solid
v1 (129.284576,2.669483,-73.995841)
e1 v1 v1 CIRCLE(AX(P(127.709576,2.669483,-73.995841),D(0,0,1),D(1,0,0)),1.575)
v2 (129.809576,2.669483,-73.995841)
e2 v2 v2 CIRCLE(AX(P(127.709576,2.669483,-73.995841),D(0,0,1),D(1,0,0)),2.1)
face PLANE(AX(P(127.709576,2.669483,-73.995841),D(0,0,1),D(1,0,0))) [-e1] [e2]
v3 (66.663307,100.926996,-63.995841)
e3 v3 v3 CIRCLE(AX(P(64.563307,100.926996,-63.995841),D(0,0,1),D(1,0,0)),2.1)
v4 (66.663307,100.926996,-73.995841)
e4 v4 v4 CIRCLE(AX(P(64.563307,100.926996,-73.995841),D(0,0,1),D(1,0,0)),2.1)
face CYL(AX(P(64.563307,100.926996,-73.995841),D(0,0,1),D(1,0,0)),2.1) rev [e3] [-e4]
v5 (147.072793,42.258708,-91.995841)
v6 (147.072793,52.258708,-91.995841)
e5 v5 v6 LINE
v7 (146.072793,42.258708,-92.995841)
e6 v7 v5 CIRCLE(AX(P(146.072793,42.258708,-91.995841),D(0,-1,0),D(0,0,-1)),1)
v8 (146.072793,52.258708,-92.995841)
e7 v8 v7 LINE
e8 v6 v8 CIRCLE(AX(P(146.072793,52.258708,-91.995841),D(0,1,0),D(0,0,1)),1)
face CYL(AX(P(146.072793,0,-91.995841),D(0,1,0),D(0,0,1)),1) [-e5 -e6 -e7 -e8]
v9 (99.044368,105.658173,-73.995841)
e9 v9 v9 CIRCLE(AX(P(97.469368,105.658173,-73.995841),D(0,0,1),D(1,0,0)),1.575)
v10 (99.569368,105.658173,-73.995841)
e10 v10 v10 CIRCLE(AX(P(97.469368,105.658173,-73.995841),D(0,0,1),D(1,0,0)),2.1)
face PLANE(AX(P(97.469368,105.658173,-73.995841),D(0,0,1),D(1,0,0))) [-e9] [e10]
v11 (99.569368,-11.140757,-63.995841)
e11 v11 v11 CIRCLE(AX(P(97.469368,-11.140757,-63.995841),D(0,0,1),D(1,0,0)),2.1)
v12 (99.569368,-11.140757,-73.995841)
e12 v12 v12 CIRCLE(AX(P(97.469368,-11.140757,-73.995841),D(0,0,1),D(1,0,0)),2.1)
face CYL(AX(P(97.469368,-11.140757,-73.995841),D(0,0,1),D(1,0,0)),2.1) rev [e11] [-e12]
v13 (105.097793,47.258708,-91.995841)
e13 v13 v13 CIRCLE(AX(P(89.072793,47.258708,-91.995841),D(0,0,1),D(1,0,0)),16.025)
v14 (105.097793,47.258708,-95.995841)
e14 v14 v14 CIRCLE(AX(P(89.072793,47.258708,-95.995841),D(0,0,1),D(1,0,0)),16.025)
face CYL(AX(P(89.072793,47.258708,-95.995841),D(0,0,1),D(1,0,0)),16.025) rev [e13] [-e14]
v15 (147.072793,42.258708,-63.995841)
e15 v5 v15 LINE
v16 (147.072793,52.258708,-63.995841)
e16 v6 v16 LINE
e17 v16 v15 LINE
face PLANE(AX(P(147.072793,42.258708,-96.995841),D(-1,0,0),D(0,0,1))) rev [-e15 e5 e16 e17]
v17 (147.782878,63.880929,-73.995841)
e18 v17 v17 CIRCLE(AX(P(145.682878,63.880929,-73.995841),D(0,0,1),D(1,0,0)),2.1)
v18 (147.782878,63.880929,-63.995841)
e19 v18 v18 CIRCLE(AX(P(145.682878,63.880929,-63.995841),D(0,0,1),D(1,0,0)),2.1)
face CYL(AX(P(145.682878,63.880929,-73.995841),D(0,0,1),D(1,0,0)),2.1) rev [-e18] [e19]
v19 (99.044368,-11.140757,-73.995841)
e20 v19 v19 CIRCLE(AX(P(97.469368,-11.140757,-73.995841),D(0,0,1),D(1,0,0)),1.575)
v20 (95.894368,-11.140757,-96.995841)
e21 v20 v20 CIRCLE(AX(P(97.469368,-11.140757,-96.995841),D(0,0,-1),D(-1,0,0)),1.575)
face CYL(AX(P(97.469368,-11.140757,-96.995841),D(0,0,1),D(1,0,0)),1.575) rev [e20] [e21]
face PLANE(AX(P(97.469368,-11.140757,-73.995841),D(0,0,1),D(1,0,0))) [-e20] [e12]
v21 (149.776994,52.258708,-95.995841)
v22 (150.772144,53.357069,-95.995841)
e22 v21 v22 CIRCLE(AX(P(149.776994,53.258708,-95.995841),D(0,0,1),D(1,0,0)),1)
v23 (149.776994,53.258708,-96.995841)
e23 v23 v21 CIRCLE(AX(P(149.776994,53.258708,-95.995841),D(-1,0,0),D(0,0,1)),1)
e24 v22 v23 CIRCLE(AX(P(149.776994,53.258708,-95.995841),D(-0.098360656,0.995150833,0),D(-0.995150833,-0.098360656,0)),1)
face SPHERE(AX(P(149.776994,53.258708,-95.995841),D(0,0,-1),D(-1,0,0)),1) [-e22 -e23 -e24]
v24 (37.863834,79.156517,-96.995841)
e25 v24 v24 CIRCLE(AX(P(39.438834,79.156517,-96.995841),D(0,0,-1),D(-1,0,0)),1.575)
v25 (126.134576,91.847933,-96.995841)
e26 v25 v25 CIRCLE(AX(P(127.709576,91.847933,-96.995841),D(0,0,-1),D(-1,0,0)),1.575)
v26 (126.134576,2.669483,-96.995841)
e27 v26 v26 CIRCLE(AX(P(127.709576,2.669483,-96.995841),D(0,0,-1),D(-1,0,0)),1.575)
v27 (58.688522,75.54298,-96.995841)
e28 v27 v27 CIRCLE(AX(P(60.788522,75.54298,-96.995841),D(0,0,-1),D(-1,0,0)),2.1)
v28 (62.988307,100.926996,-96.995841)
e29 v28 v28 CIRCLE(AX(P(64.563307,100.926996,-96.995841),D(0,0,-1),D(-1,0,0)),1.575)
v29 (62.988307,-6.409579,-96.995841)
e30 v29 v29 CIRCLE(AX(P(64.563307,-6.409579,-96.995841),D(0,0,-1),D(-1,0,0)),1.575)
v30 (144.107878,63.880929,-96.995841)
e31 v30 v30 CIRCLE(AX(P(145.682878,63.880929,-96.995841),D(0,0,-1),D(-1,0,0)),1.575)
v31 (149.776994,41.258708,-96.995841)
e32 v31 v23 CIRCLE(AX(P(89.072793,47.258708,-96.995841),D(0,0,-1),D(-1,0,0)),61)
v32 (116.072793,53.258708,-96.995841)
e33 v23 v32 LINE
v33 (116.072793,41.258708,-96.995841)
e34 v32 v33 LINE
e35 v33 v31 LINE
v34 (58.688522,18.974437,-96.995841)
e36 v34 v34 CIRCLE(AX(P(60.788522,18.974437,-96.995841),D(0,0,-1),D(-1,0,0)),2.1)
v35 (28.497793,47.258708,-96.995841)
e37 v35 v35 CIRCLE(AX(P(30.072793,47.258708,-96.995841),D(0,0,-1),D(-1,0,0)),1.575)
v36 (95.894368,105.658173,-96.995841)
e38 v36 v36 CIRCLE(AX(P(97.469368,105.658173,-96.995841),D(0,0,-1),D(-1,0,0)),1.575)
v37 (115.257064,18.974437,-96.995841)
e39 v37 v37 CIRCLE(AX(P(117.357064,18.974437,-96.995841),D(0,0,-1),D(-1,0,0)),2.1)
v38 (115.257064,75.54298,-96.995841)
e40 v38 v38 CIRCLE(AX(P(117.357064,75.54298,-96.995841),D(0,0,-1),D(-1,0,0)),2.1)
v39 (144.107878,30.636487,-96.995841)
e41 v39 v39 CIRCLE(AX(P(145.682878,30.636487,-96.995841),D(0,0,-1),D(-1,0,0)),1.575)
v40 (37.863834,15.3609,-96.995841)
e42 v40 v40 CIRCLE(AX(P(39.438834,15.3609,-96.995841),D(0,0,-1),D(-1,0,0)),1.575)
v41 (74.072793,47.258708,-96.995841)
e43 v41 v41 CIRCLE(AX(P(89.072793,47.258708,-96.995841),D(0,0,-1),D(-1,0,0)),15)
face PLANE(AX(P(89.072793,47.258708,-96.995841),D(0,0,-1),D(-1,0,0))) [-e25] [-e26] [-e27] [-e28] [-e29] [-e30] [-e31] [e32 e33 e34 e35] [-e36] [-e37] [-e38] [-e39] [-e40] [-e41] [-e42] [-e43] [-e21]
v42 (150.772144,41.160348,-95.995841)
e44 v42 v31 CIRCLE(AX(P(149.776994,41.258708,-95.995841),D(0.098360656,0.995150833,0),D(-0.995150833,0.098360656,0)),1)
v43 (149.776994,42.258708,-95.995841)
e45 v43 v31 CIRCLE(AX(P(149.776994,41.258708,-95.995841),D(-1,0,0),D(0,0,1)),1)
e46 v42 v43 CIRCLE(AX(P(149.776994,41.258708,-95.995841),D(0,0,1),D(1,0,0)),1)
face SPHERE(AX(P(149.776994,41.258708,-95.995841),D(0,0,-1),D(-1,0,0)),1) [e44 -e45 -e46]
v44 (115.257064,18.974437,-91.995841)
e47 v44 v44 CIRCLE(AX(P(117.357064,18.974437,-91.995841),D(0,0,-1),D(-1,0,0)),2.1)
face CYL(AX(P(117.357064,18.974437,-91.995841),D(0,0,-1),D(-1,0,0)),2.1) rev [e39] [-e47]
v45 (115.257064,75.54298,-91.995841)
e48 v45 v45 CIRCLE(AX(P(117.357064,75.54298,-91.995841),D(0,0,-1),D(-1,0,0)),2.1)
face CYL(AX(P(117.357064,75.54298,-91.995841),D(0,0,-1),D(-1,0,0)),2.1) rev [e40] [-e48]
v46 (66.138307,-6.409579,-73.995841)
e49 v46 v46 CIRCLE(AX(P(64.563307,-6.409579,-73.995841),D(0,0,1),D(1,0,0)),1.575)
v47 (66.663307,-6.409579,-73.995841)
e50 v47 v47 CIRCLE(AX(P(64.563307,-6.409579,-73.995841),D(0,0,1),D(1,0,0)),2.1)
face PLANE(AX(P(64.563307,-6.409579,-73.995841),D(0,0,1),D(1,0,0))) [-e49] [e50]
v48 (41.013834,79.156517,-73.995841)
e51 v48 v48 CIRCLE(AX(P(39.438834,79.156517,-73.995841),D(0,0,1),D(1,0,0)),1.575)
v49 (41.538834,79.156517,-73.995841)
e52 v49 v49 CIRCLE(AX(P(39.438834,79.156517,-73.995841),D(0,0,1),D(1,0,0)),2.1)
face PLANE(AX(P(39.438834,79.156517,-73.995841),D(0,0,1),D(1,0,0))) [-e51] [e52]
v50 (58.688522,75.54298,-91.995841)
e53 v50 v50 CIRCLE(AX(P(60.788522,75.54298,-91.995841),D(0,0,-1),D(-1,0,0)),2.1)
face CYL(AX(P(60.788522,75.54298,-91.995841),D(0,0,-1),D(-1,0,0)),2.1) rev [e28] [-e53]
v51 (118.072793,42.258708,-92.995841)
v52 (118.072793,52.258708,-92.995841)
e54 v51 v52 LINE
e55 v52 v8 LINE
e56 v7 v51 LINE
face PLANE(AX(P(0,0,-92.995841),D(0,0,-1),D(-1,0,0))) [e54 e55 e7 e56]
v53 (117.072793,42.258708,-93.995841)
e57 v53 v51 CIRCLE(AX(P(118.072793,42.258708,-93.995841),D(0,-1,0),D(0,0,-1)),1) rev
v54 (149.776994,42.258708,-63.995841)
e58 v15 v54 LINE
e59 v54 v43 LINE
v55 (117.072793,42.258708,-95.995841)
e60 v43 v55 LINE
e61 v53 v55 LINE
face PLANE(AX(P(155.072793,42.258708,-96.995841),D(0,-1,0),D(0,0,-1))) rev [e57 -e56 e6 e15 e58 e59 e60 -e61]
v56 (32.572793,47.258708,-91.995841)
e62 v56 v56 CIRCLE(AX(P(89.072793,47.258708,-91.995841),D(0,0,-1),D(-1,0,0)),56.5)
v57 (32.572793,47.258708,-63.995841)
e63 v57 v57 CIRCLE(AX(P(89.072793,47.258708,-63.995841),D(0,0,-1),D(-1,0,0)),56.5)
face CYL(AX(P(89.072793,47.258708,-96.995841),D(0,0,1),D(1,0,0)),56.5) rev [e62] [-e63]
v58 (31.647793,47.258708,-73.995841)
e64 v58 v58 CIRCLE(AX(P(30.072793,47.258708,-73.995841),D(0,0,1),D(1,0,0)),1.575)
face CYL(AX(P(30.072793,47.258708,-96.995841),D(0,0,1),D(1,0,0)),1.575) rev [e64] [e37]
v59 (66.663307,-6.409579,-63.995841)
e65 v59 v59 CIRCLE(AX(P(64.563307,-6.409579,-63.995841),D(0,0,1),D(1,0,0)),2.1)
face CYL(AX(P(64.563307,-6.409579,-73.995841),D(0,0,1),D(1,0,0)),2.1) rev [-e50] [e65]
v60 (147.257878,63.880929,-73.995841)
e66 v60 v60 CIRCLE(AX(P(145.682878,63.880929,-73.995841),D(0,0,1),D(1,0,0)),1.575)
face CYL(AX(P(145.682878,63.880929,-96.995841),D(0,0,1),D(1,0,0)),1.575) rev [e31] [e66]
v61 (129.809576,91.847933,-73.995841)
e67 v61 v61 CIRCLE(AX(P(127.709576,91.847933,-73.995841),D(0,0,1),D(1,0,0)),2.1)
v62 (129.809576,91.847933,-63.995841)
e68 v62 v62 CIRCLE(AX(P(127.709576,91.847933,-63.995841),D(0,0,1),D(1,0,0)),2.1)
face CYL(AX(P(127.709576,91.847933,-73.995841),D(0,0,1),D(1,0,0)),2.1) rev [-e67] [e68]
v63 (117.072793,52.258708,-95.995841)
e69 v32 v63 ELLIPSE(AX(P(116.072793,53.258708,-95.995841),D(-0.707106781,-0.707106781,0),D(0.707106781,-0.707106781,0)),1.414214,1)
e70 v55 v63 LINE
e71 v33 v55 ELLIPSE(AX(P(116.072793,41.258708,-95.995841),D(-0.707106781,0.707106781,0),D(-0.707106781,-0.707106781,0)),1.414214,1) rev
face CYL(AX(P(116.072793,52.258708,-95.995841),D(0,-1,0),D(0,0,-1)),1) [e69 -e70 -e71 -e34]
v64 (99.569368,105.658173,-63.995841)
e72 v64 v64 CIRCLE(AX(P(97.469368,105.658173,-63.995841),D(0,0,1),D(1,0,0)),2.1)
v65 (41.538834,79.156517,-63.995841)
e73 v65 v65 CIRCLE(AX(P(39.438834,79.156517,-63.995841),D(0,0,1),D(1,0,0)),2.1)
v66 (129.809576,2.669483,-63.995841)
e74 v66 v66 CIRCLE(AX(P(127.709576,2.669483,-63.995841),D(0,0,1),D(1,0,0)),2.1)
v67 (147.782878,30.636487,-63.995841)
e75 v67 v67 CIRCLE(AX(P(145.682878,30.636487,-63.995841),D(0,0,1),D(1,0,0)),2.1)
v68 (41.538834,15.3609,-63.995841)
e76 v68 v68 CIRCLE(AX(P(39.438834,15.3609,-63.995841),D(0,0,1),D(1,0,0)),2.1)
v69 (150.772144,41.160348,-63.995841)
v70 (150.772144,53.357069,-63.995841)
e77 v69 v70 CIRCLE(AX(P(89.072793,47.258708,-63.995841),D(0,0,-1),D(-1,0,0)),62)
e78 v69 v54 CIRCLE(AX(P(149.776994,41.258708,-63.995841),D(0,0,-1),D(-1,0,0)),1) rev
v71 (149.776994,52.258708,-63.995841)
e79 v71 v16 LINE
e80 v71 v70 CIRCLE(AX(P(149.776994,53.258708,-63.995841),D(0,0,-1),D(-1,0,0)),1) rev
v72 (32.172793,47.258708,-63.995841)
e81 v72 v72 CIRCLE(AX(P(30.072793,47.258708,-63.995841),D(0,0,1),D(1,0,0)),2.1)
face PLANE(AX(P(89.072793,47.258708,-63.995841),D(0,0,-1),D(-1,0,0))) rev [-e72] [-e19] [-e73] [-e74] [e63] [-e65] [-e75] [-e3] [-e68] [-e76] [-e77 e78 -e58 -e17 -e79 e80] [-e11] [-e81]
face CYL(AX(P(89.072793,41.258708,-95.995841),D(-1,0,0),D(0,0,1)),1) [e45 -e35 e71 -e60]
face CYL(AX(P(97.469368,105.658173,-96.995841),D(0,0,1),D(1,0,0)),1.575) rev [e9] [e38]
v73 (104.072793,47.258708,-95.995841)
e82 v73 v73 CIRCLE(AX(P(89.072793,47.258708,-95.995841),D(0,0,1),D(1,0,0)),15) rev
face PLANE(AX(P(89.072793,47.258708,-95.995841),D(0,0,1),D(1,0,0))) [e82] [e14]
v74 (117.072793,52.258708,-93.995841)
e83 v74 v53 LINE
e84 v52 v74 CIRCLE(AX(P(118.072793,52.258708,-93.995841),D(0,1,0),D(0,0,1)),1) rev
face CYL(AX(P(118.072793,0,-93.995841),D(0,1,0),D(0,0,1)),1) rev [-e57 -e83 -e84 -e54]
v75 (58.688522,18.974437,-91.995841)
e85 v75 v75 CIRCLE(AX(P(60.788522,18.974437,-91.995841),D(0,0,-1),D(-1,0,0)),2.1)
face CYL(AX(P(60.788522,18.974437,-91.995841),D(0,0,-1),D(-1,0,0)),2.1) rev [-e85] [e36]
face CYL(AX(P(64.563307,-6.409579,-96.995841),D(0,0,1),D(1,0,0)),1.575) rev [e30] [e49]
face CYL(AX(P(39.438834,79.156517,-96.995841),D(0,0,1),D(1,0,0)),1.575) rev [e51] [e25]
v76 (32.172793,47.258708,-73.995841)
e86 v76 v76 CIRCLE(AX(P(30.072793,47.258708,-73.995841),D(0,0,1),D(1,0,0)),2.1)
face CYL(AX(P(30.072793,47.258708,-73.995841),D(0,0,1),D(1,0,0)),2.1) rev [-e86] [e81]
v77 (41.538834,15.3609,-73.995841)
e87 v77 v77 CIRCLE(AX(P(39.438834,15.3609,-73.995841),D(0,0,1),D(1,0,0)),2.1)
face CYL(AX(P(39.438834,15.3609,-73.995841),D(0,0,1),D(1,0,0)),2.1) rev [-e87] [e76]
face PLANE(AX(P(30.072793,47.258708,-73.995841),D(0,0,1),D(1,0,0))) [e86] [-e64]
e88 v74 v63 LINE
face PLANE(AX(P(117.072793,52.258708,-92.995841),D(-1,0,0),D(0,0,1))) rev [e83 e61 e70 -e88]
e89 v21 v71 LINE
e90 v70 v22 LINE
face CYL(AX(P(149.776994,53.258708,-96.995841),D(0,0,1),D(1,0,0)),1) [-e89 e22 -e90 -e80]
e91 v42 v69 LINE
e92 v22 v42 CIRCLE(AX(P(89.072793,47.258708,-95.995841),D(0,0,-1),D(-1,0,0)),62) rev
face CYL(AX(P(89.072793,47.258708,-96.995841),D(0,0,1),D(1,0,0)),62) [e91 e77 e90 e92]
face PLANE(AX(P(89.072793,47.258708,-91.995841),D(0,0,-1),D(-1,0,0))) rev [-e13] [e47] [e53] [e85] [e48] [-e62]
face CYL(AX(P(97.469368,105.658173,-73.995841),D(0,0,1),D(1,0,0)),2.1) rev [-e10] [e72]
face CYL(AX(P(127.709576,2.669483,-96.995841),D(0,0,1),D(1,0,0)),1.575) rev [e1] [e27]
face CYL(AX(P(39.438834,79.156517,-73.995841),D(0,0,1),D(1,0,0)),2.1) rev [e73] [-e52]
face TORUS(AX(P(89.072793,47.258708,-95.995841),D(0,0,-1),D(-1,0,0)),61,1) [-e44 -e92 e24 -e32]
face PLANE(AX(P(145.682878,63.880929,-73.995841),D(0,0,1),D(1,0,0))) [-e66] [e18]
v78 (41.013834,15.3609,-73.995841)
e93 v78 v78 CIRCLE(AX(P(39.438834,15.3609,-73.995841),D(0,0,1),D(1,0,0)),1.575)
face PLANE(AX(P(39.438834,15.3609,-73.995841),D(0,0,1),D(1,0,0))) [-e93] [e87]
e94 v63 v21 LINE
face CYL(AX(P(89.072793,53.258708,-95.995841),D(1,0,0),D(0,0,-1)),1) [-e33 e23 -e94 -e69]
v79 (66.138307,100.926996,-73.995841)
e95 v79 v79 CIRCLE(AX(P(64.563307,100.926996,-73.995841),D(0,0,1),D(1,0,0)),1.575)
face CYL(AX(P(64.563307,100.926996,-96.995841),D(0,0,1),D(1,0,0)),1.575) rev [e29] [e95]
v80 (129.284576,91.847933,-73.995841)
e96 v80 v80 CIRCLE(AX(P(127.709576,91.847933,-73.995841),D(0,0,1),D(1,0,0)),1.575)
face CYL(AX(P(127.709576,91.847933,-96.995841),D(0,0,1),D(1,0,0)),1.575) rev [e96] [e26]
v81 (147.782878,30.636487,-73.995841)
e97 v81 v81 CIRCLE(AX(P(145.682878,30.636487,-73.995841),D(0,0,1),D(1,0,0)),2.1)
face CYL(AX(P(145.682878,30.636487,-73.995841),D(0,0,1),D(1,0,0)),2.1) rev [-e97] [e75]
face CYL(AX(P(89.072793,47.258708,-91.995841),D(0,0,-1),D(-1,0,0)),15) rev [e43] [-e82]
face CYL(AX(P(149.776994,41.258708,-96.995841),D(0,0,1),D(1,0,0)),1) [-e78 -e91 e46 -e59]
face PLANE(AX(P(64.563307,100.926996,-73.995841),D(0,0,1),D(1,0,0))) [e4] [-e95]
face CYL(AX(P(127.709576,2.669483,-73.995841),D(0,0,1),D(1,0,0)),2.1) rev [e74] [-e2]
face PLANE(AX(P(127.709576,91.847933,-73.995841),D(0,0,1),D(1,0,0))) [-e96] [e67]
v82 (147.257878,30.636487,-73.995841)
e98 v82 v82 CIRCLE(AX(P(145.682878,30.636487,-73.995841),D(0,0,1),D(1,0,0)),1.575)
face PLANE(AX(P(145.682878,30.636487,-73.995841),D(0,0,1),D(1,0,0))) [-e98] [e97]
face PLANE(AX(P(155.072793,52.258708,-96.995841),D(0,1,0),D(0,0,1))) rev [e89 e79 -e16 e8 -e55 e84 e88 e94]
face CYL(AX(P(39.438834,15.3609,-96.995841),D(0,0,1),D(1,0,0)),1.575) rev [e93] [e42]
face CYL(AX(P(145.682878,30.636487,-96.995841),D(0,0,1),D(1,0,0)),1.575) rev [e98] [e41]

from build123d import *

# Parameters (mm, degrees)
BOSS_EXTRUDE1_OUTLINE_R   = 62
BOSS_EXTRUDE1_OUTLINE_R_2 = 1.575
BOSS_EXTRUDE1_OUTLINE_R_3 = 56.5
BOSS_EXTRUDE1_DEPTH       = 33
BOSS_EXTRUDE2_START       = -5
SKETCH2_R                 = 56.5
SKETCH2_R_2               = 15
BOSS_EXTRUDE2_DEPTH       = 5
SKETCH3_R                 = 16.025
CUT_EXTRUDE1_DEPTH        = 4
SKETCH4_W                 = 8
SKETCH4_H                 = 10
CUT_EXTRUDE2_DEPTH        = 190.339520636
FILLET1_R                 = 1
SKETCH5_R                 = 2.1
CUT_EXTRUDE3_DEPTH        = 5
SKETCH6_W                 = 30
SKETCH6_H                 = 10
CUT_EXTRUDE4_DEPTH        = 4
FILLET2_R                 = 1
SKETCH7_R                 = 2.1
CUT_EXTRUDE5_DEPTH        = 10


# Read off the part's stored shape, not the designer's step: Boss-Extrude1
with BuildPart() as part:
    # Boss-Extrude1 outline → Boss-Extrude1 (new body)
    with BuildSketch(Plane(origin=(0, 0, -63.995840519), x_dir=(-1, 0, 0), z_dir=(0, 0, -1))):
        with Locations((-89.072792821, 47.25870832)):
            Circle(BOSS_EXTRUDE1_OUTLINE_R)
        with Locations((-127.709576124, 2.669483434)):
            Circle(BOSS_EXTRUDE1_OUTLINE_R_2, mode=Mode.SUBTRACT)
        with Locations((-97.469368279, -11.14075675)):
            Circle(BOSS_EXTRUDE1_OUTLINE_R_2, mode=Mode.SUBTRACT)
        with Locations((-145.682878264, 30.636487467)):
            Circle(BOSS_EXTRUDE1_OUTLINE_R_2, mode=Mode.SUBTRACT)
        with Locations((-64.563307054, -6.409579405)):
            Circle(BOSS_EXTRUDE1_OUTLINE_R_2, mode=Mode.SUBTRACT)
        with Locations((-39.438834384, 15.360900091)):
            Circle(BOSS_EXTRUDE1_OUTLINE_R_2, mode=Mode.SUBTRACT)
        with Locations((-145.682878264, 63.880929174)):
            Circle(BOSS_EXTRUDE1_OUTLINE_R_2, mode=Mode.SUBTRACT)
        with Locations((-127.709576124, 91.847933207)):
            Circle(BOSS_EXTRUDE1_OUTLINE_R_2, mode=Mode.SUBTRACT)
        with Locations((-97.469368279, 105.658173391)):
            Circle(BOSS_EXTRUDE1_OUTLINE_R_2, mode=Mode.SUBTRACT)
        with Locations((-89.072792821, 47.25870832)):
            Circle(BOSS_EXTRUDE1_OUTLINE_R_3, mode=Mode.SUBTRACT)
        with Locations((-30.072792821, 47.25870832)):
            Circle(BOSS_EXTRUDE1_OUTLINE_R_2, mode=Mode.SUBTRACT)
        with Locations((-64.563307054, 100.926996046)):
            Circle(BOSS_EXTRUDE1_OUTLINE_R_2, mode=Mode.SUBTRACT)
        with Locations((-39.438834384, 79.15651655)):
            Circle(BOSS_EXTRUDE1_OUTLINE_R_2, mode=Mode.SUBTRACT)
    extrude(amount=BOSS_EXTRUDE1_DEPTH)

    # Sketch2 → Boss-Extrude2 (add)
    with BuildSketch(Plane(origin=(0, 0, -96.995840519), x_dir=(-1, 0, 0), z_dir=(0, 0, -1)).offset(BOSS_EXTRUDE2_START)):
        with Locations((-89.072792821, 47.25870832)):
            Circle(SKETCH2_R)
        with Locations((-89.072792821, 47.25870832)):
            Circle(SKETCH2_R_2, mode=Mode.SUBTRACT)
    extrude(amount=BOSS_EXTRUDE2_DEPTH)

    # Sketch3 → Cut-Extrude1 (cut)
    with BuildSketch(Plane.XY.offset(-91.995840519)):
        with Locations((89.072792821, 47.25870832)):
            Circle(SKETCH3_R)
    extrude(amount=-CUT_EXTRUDE1_DEPTH, mode=Mode.SUBTRACT)

    # Sketch4 → Cut-Extrude2 (cut, through all)
    with BuildSketch(Plane.XY.offset(-63.995840519)):
        with Locations((151.072792821, 47.25870832)):
            Rectangle(SKETCH4_W, SKETCH4_H)
    extrude(amount=-CUT_EXTRUDE2_DEPTH, mode=Mode.SUBTRACT)

    # Fillet1
    fillet1_edges = [part.edges().sort_by_distance(p)[0] for p in [
        (150.870851043, 42.25870832, -80.495840519),
        (150.870851043, 52.25870832, -80.495840519),
    ]]
    fillet(fillet1_edges, radius=FILLET1_R)

    # Sketch5 → Cut-Extrude3 (cut)
    with BuildSketch(Plane(origin=(0, 0, -96.995840519), x_dir=(-1, 0, 0), z_dir=(0, 0, -1))):
        with Locations((-117.357064069, 75.542979568)):
            Circle(SKETCH5_R)
        with Locations((-60.788521574, 75.542979568)):
            Circle(SKETCH5_R)
        with Locations((-60.788521574, 18.974437073)):
            Circle(SKETCH5_R)
        with Locations((-117.357064069, 18.974437073)):
            Circle(SKETCH5_R)
    extrude(amount=-CUT_EXTRUDE3_DEPTH, mode=Mode.SUBTRACT)

    # Sketch6 → Cut-Extrude4 (cut)
    with BuildSketch(Plane(origin=(0, 0, -96.995840519), x_dir=(-1, 0, 0), z_dir=(0, 0, -1))):
        with Locations((-132.072792821, 47.25870832)):
            Rectangle(SKETCH6_W, SKETCH6_H)
    extrude(amount=-CUT_EXTRUDE4_DEPTH, mode=Mode.SUBTRACT)

    # Fillet2
    fillet2_edges = [part.edges().sort_by_distance(p)[0] for p in [
        (147.072792821, 47.25870832, -92.995840519),
        (117.072792821, 47.25870832, -92.995840519),
        (117.072792821, 47.25870832, -96.995840519),
        (133.424893243, 42.25870832, -96.995840519),
        (86.019909262, -14.666083985, -96.995840519),
        (133.424893243, 52.25870832, -96.995840519),
        (150.518060684, 52.587277258, -96.995840519),
        (150.518060684, 41.930139383, -96.995840519),
    ]]
    fillet(fillet2_edges, radius=FILLET2_R)

    # Sketch7 → Cut-Extrude5 (cut)
    with BuildSketch(Plane.XY.offset(-63.995840519)):
        with Locations((30.072792821, 47.25870832)):
            Circle(SKETCH7_R)
        with Locations((39.438834384, 79.15651655)):
            Circle(SKETCH7_R)
        with Locations((64.563307054, 100.926996046)):
            Circle(SKETCH7_R)
        with Locations((97.469368279, 105.658173391)):
            Circle(SKETCH7_R)
        with Locations((127.709576124, 91.847933207)):
            Circle(SKETCH7_R)
        with Locations((145.682878264, 63.880929174)):
            Circle(SKETCH7_R)
        with Locations((145.682878264, 30.636487467)):
            Circle(SKETCH7_R)
        with Locations((127.709576124, 2.669483434)):
            Circle(SKETCH7_R)
        with Locations((97.469368279, -11.14075675)):
            Circle(SKETCH7_R)
        with Locations((64.563307054, -6.409579405)):
            Circle(SKETCH7_R)
        with Locations((39.438834384, 15.360900091)):
            Circle(SKETCH7_R)
    extrude(amount=-CUT_EXTRUDE5_DEPTH, mode=Mode.SUBTRACT)


solid = part.part
